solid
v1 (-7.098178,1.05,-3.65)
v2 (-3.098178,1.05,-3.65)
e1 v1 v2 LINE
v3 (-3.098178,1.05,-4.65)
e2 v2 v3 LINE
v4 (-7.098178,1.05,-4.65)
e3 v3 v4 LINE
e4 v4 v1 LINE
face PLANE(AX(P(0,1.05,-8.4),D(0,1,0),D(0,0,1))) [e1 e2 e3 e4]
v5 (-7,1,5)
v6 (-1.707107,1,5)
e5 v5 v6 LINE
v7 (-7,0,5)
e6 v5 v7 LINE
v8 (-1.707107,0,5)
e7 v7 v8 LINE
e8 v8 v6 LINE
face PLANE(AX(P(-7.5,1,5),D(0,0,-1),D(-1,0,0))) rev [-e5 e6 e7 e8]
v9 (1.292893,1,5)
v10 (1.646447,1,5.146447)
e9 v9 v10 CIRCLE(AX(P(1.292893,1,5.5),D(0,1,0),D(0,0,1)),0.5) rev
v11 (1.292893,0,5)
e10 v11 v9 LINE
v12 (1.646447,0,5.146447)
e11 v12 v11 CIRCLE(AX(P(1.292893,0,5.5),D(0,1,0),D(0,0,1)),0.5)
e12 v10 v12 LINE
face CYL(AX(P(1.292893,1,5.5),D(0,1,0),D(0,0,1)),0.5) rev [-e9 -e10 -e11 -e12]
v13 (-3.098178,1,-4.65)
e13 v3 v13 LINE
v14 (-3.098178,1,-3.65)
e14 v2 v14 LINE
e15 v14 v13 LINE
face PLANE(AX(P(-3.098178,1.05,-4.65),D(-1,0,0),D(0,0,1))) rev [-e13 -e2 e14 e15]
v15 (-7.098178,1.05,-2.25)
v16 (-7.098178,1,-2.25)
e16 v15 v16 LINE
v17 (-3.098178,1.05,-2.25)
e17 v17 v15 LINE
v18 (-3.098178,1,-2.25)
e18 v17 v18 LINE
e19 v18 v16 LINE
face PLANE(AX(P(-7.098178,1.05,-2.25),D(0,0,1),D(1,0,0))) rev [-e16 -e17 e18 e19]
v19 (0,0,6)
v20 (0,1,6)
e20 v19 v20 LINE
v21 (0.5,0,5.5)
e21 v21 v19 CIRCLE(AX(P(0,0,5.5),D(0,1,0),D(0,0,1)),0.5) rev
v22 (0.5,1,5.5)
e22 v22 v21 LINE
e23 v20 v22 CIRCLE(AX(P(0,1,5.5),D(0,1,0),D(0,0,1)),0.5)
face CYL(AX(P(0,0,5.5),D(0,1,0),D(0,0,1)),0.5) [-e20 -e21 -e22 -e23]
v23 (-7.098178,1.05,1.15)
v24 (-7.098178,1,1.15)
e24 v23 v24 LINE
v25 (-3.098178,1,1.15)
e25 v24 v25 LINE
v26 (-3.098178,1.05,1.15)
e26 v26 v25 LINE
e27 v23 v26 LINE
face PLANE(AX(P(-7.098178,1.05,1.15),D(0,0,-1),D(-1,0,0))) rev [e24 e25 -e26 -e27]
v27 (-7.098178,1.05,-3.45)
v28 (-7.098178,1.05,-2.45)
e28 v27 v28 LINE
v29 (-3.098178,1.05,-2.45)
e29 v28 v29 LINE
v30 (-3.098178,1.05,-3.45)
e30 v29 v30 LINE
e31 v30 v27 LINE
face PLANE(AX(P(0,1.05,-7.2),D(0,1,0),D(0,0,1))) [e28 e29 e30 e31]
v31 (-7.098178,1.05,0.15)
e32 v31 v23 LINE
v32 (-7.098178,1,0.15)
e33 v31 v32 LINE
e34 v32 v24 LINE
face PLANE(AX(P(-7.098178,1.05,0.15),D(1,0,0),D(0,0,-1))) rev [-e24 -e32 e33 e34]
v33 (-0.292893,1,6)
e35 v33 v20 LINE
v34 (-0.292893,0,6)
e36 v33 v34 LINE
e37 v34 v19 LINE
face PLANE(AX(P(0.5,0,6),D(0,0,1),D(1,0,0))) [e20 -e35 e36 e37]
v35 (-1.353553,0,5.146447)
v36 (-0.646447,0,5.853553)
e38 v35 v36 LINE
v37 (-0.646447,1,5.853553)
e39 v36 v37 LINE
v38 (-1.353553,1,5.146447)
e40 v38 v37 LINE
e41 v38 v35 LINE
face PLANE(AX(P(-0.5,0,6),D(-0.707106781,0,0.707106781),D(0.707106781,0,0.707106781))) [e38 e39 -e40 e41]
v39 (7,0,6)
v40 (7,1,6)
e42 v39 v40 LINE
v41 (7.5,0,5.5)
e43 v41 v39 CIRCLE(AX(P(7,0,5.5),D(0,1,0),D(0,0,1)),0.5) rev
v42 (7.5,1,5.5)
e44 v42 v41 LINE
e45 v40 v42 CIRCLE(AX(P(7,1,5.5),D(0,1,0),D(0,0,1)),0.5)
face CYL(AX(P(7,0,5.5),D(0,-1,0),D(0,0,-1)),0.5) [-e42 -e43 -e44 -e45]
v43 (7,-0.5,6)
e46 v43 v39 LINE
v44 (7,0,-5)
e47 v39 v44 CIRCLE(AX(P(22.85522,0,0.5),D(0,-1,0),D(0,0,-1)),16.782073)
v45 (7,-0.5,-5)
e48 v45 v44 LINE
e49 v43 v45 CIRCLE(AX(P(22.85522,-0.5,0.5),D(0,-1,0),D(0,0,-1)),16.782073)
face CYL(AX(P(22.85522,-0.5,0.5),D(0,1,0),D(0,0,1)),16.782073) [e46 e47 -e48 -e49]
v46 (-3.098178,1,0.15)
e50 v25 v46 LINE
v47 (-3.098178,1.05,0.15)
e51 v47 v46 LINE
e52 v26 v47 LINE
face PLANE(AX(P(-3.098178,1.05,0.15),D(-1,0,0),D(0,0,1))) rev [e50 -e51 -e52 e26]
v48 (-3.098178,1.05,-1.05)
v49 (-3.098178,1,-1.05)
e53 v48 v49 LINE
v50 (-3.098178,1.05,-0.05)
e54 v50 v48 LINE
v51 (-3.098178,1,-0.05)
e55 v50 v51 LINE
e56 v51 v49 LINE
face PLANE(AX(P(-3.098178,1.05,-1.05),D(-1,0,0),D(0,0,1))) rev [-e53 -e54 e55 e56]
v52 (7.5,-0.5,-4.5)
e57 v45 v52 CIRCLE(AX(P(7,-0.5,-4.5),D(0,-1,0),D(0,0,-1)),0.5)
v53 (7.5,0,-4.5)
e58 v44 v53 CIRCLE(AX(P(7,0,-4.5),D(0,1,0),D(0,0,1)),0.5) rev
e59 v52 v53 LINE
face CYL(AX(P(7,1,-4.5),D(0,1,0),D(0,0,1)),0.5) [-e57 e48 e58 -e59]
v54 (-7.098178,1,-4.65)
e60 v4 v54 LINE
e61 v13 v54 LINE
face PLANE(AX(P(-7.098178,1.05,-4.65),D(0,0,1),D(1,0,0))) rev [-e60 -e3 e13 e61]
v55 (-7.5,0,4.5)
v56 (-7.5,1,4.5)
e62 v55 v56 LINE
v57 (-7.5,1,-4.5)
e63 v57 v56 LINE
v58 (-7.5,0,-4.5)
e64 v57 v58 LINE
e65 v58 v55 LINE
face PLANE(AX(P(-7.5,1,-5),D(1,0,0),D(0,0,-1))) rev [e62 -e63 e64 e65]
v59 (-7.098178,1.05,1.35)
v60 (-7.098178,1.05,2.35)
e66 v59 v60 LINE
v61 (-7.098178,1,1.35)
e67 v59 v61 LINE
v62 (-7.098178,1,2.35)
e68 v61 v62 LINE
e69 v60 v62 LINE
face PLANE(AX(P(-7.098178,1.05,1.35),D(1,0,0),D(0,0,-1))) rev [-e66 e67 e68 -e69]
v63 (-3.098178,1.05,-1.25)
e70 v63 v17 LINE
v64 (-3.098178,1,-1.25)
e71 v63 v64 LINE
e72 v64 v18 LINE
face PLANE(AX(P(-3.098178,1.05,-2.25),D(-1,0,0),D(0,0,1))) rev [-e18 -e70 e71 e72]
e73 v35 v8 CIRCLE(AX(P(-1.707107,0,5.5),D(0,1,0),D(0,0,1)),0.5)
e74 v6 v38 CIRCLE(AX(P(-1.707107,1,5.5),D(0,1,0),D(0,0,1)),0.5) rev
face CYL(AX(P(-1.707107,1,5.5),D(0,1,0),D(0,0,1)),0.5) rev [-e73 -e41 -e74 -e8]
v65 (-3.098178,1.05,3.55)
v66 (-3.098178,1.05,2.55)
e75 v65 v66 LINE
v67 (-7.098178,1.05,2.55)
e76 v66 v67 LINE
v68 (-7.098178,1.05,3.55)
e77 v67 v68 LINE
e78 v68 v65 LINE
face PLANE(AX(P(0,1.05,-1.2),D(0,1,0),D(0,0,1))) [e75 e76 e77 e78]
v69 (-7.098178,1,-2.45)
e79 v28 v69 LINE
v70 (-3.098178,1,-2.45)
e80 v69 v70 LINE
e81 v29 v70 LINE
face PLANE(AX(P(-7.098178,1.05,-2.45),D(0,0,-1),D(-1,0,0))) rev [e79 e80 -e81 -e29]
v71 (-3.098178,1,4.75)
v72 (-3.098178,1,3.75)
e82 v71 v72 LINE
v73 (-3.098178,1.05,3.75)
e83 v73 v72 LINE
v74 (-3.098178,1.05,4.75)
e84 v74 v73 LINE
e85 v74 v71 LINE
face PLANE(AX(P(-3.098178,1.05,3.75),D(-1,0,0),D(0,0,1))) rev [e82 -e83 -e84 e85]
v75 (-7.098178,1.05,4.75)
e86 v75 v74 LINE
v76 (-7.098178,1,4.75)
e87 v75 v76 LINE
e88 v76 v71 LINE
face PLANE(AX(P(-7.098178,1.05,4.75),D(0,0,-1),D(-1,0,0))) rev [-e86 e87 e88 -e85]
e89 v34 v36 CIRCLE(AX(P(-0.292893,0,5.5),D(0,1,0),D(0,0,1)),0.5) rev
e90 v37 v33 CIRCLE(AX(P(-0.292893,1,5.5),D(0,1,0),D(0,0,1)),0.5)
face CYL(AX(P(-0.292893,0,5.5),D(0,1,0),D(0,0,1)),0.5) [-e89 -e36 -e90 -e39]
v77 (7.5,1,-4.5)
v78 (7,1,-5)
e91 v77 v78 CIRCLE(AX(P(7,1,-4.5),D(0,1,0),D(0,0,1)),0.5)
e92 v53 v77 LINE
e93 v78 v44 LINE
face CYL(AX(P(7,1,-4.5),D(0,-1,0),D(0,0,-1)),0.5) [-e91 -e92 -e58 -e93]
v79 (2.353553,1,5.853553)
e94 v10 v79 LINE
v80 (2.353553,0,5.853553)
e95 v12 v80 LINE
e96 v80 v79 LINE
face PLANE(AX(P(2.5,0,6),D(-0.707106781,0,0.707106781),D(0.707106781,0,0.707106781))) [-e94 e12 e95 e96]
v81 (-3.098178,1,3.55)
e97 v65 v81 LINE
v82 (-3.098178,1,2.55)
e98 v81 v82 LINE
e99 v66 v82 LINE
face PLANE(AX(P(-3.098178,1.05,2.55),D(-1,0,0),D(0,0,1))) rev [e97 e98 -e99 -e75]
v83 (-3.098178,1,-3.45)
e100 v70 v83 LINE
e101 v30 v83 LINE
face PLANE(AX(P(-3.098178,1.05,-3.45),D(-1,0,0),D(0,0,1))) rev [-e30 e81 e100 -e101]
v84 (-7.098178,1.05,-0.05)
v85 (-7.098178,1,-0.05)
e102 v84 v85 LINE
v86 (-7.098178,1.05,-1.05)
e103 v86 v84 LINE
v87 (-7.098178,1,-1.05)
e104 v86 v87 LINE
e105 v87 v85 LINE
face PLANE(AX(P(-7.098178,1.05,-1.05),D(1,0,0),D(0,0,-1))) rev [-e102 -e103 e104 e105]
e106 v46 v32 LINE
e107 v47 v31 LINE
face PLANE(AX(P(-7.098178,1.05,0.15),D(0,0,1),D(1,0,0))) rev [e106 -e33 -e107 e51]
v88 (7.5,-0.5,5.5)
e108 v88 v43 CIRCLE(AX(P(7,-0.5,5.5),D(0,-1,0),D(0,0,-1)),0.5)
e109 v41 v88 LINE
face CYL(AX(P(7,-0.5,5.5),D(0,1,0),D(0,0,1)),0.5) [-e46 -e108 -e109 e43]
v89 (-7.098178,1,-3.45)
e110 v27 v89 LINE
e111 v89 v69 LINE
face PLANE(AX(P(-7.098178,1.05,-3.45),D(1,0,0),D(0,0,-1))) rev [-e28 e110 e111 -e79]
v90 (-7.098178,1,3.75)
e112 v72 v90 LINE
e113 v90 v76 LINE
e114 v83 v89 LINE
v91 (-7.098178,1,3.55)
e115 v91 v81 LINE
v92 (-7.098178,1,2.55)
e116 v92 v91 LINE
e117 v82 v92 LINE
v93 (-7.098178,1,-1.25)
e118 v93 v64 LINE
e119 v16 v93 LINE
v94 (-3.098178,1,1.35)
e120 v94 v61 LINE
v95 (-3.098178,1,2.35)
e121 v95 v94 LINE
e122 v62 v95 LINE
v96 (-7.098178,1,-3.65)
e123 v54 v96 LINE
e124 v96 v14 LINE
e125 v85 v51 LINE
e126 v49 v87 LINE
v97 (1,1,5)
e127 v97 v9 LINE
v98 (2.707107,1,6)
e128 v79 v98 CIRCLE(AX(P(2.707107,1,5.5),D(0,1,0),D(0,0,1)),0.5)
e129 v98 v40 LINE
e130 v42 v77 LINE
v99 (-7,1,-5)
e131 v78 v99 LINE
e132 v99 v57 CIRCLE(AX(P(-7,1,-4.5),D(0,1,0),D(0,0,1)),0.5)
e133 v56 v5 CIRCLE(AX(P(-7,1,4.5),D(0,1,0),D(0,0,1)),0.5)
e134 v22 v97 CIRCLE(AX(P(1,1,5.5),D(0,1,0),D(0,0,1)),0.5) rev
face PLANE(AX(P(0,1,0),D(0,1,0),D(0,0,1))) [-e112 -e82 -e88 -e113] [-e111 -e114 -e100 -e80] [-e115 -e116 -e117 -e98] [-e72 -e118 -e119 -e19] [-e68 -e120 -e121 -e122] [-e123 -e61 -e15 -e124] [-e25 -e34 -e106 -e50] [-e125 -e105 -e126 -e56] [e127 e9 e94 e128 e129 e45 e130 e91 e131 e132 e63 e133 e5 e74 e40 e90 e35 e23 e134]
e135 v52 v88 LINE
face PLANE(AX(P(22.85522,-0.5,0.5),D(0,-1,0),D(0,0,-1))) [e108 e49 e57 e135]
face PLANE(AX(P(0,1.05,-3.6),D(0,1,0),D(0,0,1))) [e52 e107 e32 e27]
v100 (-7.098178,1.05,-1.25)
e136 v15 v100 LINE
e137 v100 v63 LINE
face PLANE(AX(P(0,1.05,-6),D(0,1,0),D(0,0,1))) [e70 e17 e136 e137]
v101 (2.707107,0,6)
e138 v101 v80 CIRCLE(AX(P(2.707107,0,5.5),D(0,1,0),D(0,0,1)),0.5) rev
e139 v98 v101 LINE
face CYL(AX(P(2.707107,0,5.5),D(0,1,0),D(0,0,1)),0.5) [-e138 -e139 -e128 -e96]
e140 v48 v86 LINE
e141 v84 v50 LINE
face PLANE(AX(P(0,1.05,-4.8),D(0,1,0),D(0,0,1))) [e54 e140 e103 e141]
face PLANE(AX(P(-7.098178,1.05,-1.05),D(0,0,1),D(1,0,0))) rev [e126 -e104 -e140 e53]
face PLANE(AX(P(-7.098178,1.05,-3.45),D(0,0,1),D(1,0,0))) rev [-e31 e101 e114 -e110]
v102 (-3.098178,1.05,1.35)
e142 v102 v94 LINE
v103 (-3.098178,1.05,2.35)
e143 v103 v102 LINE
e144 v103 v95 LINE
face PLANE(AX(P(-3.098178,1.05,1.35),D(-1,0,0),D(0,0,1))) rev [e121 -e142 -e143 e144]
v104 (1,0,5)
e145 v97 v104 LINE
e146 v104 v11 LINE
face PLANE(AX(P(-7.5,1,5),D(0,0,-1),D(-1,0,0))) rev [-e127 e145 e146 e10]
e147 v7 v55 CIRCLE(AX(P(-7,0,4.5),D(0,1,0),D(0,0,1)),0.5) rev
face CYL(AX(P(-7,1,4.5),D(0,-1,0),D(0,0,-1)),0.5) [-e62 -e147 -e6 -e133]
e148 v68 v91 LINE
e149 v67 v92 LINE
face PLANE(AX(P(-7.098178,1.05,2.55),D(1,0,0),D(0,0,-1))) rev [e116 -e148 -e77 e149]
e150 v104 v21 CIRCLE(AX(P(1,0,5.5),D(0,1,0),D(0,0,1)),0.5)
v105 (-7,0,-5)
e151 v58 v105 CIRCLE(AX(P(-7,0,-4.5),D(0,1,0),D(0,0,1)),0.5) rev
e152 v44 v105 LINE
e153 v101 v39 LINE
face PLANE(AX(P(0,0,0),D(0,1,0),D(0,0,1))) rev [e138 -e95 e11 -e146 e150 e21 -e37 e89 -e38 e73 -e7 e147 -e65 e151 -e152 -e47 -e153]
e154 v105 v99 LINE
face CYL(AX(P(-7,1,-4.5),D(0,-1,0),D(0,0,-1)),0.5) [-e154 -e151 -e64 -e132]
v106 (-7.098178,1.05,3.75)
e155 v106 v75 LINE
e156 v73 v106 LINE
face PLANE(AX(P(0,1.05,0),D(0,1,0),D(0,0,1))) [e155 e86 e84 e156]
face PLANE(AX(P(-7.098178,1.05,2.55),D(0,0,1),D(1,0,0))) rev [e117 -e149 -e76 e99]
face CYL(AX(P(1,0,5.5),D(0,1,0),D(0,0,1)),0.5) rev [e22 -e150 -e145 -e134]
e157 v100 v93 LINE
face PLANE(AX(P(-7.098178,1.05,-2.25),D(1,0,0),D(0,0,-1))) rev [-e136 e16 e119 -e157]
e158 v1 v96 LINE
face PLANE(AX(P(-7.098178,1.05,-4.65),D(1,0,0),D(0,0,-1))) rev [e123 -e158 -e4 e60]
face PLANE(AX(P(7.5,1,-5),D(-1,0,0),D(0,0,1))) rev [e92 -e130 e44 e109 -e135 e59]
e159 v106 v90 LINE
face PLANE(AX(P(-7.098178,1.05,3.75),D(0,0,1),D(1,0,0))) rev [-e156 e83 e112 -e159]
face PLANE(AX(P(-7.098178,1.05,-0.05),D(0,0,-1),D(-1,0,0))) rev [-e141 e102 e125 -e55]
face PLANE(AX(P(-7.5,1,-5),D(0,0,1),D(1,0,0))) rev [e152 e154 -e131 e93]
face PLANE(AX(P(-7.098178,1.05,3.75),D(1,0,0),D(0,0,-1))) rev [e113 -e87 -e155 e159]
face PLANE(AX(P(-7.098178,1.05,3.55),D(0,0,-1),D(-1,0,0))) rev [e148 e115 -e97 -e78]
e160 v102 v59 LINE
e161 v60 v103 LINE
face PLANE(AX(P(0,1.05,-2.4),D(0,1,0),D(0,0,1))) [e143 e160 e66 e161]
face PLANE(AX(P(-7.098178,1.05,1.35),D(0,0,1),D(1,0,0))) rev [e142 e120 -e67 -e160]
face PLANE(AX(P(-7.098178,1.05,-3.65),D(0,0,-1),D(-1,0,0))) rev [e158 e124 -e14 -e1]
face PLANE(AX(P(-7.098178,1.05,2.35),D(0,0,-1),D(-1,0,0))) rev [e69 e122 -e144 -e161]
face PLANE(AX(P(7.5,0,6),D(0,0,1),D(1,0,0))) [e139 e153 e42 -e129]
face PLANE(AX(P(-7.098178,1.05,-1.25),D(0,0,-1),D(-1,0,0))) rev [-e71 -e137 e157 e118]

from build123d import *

# Parameters (mm, degrees)
SKETCH1_W           = 15
SKETCH1_H           = 10
BOSS_EXTRUDE1_DEPTH = 1
BOSS_EXTRUDE2_DEPTH = 1
BOSS_EXTRUDE3_DEPTH = 1
SKETCH4_W           = 4
SKETCH4_H           = 1
BOSS_EXTRUDE4_DEPTH = 0.05
LPATTERN1_COUNT     = 8
LPATTERN1_PITCH     = 1.2
FILLET1_R           = 0.5
BOSS_EXTRUDE5_DEPTH = 0.5
FILLET2_R           = 0.5


with BuildPart() as part:
    # Sketch1 → Boss-Extrude1 (new body)
    with BuildSketch(Plane(origin=(0, 0, 0), x_dir=(1, 0, 0), z_dir=(0, 1, 0))):
        Rectangle(SKETCH1_W, SKETCH1_H)
    extrude(amount=BOSS_EXTRUDE1_DEPTH)

    # Sketch2 → Boss-Extrude2 (add)
    with BuildSketch(Plane(origin=(0, 1, 0), x_dir=(1, 0, 0), z_dir=(0, 1, 0))):
        Polygon((7.5, -5), (7.5, -6), (2.5, -6), (1.5, -5), align=None)
    extrude(amount=-BOSS_EXTRUDE2_DEPTH)

    # Sketch3 → Boss-Extrude3 (add)
    with BuildSketch(Plane(origin=(0, 1, 0), x_dir=(1, 0, 0), z_dir=(0, 1, 0))):
        Polygon((0.5, -5), (0.5, -6), (-0.5, -6), (-1.5, -5), align=None)
    extrude(amount=-BOSS_EXTRUDE3_DEPTH)

    # Sketch4 → Boss-Extrude4 (add)
    with BuildSketch(Plane(origin=(0, 1, 0), x_dir=(1, 0, 0), z_dir=(0, 1, 0))):
        with Locations((-5.09817827, -4.25)):
            Rectangle(SKETCH4_W, SKETCH4_H)
    boss_extrude4 = extrude(amount=BOSS_EXTRUDE4_DEPTH)

    # LPattern1: Boss-Extrude4 ×8
    with Locations(*[(0, 0, -i * LPATTERN1_PITCH) for i in range(1, LPATTERN1_COUNT)]):
        add(boss_extrude4)

    # Fillet1
    fillet1_edges = [part.edges().sort_by_distance(p)[0] for p in [
        (-1.5, 0.5, 5),
        (1.5, 0.5, 5),
        (0.5, 0.5, 5),
        (2.5, 0.5, 6),
        (-0.5, 0.5, 6),
        (0.5, 0.5, 6),
        (7.5, 0.5, 6),
        (7.5, 0.5, -5),
        (-7.5, 0.5, -5),
        (-7.5, 0.5, 5),
    ]]
    fillet(fillet1_edges, radius=FILLET1_R - 0.0001)  # a hair under: the kernel refuses the full size

    # Sketch6 → Boss-Extrude5 (add)
    with BuildSketch(Plane.XZ):
        with BuildLine():
            Line((7.5, -5), (7.5, 6))
            Line((7.5, 6), (7, 6))
            ThreePointArc((7, 6), (6.073146166, 0.5), (7, -5))
            Line((7, -5), (7.5, -5))
        make_face()
    extrude(amount=BOSS_EXTRUDE5_DEPTH)

    # Fillet2
    fillet2_edges = [part.edges().sort_by_distance(p)[0] for p in [
        (7.5, -0.25, 6),
        (7.5, -0.25, -5),
    ]]
    fillet(fillet2_edges, radius=FILLET2_R - 0.0001)  # a hair under: the kernel refuses the full size


solid = part.part
